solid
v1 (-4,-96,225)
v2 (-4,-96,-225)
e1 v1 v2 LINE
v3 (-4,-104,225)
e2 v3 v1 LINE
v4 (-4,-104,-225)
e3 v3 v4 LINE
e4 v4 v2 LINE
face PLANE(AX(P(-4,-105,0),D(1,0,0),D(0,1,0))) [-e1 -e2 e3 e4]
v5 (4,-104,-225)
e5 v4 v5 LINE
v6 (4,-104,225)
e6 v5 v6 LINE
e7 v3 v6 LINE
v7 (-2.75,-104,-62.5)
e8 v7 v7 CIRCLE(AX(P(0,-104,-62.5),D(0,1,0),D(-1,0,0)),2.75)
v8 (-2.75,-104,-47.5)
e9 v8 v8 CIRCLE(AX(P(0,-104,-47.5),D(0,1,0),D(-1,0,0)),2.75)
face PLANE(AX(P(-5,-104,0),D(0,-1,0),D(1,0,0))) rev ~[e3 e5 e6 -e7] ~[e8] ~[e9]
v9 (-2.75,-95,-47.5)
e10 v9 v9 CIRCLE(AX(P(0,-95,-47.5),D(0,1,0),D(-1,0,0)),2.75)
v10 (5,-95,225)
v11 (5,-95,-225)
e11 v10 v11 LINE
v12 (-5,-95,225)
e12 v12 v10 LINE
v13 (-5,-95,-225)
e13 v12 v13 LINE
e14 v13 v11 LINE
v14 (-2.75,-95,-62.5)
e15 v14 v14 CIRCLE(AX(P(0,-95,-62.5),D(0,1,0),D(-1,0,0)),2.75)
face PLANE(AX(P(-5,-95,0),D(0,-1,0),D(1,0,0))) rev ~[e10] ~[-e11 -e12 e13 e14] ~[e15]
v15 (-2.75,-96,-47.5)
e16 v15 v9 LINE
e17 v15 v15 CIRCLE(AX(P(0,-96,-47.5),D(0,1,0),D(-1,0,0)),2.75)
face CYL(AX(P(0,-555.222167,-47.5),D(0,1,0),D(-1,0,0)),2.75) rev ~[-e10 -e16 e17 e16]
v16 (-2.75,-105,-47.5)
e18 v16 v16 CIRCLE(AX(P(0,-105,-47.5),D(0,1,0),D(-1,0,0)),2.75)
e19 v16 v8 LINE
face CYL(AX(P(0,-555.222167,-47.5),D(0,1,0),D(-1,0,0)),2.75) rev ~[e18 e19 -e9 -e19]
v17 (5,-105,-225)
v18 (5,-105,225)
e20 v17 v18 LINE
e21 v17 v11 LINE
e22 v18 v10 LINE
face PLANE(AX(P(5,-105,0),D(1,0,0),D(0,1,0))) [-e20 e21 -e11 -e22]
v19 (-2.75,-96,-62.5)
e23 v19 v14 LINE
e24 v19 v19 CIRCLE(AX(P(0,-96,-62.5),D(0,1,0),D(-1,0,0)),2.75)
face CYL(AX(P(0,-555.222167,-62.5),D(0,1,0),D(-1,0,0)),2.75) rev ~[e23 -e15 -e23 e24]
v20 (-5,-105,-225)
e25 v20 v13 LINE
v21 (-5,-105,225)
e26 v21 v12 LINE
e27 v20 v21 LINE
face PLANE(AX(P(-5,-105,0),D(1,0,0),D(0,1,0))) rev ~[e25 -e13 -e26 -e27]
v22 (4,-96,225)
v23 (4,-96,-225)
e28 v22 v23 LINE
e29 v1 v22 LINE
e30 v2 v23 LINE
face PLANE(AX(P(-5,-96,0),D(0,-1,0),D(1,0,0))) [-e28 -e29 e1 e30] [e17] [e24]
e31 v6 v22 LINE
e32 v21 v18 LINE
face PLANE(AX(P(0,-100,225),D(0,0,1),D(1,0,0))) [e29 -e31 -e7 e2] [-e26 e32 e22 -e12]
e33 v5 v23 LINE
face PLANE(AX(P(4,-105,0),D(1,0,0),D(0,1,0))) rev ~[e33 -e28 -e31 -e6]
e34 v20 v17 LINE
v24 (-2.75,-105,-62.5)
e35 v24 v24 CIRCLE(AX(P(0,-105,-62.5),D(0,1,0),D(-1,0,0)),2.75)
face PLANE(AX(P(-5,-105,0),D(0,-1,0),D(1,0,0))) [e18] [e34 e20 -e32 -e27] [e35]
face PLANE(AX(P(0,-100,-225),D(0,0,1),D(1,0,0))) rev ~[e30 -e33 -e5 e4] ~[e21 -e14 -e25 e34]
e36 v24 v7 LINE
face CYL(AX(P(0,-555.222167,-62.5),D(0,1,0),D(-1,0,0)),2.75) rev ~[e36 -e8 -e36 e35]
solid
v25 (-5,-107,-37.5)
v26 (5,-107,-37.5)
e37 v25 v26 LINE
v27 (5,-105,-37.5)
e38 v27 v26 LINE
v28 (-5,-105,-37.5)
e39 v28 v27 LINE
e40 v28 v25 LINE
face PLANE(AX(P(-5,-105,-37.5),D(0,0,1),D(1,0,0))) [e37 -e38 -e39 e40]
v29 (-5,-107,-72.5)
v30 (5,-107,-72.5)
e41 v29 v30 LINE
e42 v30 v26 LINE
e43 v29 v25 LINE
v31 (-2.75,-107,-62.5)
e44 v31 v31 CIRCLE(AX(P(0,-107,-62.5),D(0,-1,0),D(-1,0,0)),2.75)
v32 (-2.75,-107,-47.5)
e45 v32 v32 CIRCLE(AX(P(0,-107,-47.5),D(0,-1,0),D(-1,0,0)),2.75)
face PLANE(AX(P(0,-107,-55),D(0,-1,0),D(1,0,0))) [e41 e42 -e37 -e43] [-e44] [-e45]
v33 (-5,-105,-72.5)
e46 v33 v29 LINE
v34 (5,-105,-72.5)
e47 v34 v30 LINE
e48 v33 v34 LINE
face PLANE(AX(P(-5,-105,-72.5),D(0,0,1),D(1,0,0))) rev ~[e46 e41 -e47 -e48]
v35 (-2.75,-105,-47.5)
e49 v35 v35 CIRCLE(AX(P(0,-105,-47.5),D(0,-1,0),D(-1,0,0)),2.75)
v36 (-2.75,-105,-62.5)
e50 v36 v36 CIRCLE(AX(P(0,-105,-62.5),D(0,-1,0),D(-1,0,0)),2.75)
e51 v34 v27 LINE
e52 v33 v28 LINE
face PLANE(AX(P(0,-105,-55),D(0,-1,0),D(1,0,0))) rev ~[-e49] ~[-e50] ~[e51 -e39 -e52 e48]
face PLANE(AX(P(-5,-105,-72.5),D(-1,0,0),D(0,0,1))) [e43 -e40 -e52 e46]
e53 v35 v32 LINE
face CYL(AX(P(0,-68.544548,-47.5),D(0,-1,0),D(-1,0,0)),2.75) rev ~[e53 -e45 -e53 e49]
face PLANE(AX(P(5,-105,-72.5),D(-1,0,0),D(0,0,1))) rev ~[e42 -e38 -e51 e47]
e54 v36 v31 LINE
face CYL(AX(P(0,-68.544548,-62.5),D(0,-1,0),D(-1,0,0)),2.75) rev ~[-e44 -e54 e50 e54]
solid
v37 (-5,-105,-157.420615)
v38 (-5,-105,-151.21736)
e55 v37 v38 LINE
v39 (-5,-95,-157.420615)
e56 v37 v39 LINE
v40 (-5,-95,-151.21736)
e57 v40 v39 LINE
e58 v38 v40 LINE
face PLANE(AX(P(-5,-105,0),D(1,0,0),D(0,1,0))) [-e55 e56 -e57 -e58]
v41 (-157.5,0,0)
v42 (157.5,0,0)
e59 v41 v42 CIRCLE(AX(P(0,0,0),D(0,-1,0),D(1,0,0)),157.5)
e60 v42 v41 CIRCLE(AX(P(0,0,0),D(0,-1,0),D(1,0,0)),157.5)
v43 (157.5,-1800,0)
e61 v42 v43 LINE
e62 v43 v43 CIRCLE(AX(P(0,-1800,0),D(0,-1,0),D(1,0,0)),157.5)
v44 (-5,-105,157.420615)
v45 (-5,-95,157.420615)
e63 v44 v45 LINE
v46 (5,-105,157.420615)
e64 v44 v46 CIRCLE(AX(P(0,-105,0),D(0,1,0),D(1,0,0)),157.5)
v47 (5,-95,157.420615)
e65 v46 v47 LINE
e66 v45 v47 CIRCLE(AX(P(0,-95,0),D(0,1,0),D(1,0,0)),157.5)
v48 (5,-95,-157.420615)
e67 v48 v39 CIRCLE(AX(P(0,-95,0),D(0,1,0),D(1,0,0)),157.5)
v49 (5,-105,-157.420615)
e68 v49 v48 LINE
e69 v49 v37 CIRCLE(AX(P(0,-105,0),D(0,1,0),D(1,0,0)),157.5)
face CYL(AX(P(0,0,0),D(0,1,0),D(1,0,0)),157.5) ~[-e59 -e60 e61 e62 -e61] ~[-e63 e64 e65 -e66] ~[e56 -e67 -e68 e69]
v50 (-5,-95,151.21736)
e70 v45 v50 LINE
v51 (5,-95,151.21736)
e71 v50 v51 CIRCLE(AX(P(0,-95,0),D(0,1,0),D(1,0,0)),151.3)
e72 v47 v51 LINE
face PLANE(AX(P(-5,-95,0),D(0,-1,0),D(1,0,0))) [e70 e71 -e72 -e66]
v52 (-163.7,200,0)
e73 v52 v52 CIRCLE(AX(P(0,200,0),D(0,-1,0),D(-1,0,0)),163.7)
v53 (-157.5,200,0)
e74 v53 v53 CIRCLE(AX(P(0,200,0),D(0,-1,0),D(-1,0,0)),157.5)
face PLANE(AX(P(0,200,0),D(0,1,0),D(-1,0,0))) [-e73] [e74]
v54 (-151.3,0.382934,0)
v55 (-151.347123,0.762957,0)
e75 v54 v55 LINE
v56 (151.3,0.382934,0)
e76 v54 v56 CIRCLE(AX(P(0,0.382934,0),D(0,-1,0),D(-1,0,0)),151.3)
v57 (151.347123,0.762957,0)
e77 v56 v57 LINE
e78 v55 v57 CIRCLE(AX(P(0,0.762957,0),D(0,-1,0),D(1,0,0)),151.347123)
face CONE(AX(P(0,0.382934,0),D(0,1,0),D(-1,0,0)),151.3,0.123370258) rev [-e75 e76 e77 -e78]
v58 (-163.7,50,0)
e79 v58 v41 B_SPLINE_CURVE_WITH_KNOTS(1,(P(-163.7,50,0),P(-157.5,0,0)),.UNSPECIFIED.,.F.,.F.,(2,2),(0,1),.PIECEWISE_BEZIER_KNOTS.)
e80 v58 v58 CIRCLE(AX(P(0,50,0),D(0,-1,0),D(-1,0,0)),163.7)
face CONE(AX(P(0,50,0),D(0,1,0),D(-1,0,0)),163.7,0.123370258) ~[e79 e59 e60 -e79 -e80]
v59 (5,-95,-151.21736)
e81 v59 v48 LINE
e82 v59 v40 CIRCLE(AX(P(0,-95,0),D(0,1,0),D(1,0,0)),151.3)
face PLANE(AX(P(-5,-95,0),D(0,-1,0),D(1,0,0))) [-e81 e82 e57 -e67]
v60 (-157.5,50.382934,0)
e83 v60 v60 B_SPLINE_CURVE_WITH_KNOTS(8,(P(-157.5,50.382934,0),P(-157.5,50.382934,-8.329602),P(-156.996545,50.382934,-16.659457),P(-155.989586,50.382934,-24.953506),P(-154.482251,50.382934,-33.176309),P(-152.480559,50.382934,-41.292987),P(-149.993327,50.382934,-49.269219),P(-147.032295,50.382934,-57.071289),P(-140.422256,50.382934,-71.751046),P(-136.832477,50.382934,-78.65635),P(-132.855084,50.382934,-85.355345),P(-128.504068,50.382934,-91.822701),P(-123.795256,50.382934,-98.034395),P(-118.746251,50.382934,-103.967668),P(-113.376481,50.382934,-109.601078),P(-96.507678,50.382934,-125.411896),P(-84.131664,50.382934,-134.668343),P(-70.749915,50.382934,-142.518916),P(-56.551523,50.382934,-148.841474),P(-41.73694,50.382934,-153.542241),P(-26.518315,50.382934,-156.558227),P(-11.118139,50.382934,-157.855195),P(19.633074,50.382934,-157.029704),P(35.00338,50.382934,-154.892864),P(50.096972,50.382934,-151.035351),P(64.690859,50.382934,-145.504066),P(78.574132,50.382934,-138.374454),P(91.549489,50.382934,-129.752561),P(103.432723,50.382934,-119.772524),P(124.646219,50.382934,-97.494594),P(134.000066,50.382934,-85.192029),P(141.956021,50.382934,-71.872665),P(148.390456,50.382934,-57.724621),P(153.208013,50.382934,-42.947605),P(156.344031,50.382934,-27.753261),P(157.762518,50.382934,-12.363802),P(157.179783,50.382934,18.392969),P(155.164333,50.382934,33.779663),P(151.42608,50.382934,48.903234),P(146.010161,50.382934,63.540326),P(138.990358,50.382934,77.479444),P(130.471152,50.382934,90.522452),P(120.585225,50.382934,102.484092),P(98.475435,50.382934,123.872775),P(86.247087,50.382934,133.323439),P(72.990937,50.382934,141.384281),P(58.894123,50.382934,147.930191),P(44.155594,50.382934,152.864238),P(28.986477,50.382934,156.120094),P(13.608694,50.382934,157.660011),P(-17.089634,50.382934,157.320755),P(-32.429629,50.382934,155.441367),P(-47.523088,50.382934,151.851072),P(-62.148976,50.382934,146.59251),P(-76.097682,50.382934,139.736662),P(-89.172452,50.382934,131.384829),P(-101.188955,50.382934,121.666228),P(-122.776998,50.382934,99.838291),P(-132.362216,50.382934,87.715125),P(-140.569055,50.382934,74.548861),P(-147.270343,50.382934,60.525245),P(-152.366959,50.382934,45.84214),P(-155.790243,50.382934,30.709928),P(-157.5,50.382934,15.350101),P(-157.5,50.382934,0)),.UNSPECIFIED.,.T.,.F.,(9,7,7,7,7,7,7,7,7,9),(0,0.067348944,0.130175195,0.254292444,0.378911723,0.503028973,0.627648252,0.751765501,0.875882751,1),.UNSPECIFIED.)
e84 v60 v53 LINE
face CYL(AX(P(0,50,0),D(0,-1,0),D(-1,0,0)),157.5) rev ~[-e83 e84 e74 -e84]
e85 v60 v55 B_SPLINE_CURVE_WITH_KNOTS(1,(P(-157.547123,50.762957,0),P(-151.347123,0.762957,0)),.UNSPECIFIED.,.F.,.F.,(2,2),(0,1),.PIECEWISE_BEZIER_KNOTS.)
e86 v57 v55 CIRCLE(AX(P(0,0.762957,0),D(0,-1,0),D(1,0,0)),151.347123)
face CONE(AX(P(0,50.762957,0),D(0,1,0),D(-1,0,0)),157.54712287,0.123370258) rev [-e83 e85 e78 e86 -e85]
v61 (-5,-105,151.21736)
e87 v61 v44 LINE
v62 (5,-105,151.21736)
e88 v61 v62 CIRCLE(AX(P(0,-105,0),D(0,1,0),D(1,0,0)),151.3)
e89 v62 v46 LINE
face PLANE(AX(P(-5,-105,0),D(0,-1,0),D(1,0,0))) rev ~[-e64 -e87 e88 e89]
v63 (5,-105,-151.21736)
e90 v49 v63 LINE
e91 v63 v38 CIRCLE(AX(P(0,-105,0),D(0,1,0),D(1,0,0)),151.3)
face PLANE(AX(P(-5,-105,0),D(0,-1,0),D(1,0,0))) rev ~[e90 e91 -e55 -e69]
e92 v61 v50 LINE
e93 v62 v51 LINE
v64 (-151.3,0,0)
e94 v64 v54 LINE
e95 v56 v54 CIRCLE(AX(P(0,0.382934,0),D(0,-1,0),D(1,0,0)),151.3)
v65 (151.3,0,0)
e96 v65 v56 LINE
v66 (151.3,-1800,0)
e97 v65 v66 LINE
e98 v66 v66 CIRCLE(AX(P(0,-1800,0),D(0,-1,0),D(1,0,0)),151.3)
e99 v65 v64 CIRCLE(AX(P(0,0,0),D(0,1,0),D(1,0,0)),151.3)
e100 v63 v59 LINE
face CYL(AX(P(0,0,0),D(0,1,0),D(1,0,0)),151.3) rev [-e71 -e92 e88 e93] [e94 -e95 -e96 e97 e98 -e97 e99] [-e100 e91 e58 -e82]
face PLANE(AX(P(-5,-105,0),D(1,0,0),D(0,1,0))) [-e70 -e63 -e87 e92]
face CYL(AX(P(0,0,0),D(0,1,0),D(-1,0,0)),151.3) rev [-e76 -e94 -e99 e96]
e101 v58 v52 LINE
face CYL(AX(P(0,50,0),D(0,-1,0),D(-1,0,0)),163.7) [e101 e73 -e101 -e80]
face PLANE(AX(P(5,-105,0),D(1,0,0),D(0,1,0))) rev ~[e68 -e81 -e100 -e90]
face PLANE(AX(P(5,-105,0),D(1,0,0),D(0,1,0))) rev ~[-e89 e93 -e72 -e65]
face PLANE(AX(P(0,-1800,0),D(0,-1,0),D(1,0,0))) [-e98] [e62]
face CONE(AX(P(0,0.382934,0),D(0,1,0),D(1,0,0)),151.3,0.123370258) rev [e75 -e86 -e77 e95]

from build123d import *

# Parameters (mm, degrees)
F0_R        = 157.5
F1_DEPTH    = 1800
F3_R        = 163.7
F1_FACE_R   = 157.5
F5_DEPTH    = 150
F6_T        = 6.2
F6_T4_ANGLE = 180.000000001
F6_T6_ANGLE = 180.000000001
F7_W        = 10
F7_H        = 10
F8_DEPTH    = 350
F9_DEPTH    = 225
F10_T       = -1
F11_W       = 10
F11_H       = 35
F12_DEPTH   = 2
F13_D       = 5.5
F14_D       = 5.5


# Not quite as in the source:
# - a shell that OpenCascade refuses in one call is made with other operations: the cavity is built on its own and cut out
# - a feature names something its author has since deleted; it is built from what else it names


with BuildPart() as f1:
    # F0 (on Front) → F1 (new body)
    with BuildSketch(Plane.XZ):
        Circle(F0_R)
    extrude(amount=F1_DEPTH)

    # F3 (on offset) → F4 section 0
    with BuildSketch(Plane(origin=(0, 50, 0), x_dir=(-1, 0, 0), z_dir=(0, 1, 0))):
        Circle(F3_R)
    # F1_face (on face) → F4 section 1
    with BuildSketch(Plane(origin=(0, 0, 0), x_dir=(1, 0, 0), z_dir=(0, 1, 0))):
        Circle(F1_FACE_R)
    loft()

    # F5 (add): a face of the model
    f5_faces = [f1.faces().sort_by_distance(p)[0] for p in [
        (0, 50, 0),
    ]]
    extrude(f5_faces, amount=F5_DEPTH)

    # F6: shell of thickness 6.2, made by hand


with BuildPart() as f6_core1:
    # F6_t2: copy of F1
    add(f1.part)

    # the walls: a layer under each face that stays
    f6_faces = [f6_core1.faces().sort_by_distance(p)[0] for p in [
        (-157.5, -900, 0),
        (160.6, 25, 0),
        (163.7, 125, 0),
    ]]
    thicken(f6_faces, amount=-F6_T, mode=Mode.SUBTRACT)

    # F6_s3 → F6_t4 (revolve, cut)
    with BuildSketch(Plane.XY):
        Polygon((157.6235287713, -0.0076295676), (151.3, 0), (151.3, 0.3829336184), (151.3471228701, 0.7629567641), align=None)
    revolve(axis=Axis((0, 0, 0), (0, -1, 0)), revolution_arc=F6_T4_ANGLE, mode=Mode.SUBTRACT)

    # F6_s5 → F6_t6 (revolve, cut)
    with BuildSketch(Plane.XY):
        Polygon((-157.6235287713, -0.0076295676), (-151.3, 0), (-151.3, 0.3829336184), (-151.3471228701, 0.7629567641), align=None)
    revolve(axis=Axis((0, 0, 0), (0, -1, 0)), revolution_arc=F6_T6_ANGLE, mode=Mode.SUBTRACT)


with BuildPart() as f1_1:
    add(f1.part)

    # what is left inside the walls is the cavity
    f6_cavity = [f6_core1.part.solids().sort_by_distance(p)[0] for p in [
        (-151.238, -1199.872355, 0),
    ]]
    add(f6_cavity, mode=Mode.SUBTRACT)

    # F7 (on Top) → F8 (cut, symmetric)
    with BuildSketch(Plane.XY):
        with Locations((0, -100)):
            Rectangle(F7_W, F7_H)
    extrude(amount=F8_DEPTH, both=True, mode=Mode.SUBTRACT)


with BuildPart() as f9:
    # F7 (on Top) → F9 (new body, symmetric)
    with BuildSketch(Plane.XY):
        with Locations((0, -100)):
            Rectangle(F7_W, F7_H)
    extrude(amount=F9_DEPTH, both=True)

    # F10
    f10_openings = [f9.faces().sort_by_distance(p)[0] for p in [
        (0, -100, 225),
        (0, -100, -225),
    ]]
    offset(amount=F10_T, openings=f10_openings)

    # F13 (through all)
    with Locations(Plane.XZ.offset(105)):
        with Locations((0, -47.5), (0, -62.5)):
            Hole(F13_D / 2)


with BuildPart() as f12:
    # F11 (on face) → F12 (new body)
    with BuildSketch(Plane.XZ.offset(105)):
        with Locations((0, -55)):
            Rectangle(F11_W, F11_H)
    extrude(amount=F12_DEPTH)

    # F14 (through all)
    with Locations(Plane(origin=(0, -105, 0), x_dir=(1, 0, 0), z_dir=(0, 1, 0))):
        with Locations((0, 47.5), (0, 62.5)):
            Hole(F14_D / 2)


solid = Compound([f1_1.part, f9.part, f12.part])
